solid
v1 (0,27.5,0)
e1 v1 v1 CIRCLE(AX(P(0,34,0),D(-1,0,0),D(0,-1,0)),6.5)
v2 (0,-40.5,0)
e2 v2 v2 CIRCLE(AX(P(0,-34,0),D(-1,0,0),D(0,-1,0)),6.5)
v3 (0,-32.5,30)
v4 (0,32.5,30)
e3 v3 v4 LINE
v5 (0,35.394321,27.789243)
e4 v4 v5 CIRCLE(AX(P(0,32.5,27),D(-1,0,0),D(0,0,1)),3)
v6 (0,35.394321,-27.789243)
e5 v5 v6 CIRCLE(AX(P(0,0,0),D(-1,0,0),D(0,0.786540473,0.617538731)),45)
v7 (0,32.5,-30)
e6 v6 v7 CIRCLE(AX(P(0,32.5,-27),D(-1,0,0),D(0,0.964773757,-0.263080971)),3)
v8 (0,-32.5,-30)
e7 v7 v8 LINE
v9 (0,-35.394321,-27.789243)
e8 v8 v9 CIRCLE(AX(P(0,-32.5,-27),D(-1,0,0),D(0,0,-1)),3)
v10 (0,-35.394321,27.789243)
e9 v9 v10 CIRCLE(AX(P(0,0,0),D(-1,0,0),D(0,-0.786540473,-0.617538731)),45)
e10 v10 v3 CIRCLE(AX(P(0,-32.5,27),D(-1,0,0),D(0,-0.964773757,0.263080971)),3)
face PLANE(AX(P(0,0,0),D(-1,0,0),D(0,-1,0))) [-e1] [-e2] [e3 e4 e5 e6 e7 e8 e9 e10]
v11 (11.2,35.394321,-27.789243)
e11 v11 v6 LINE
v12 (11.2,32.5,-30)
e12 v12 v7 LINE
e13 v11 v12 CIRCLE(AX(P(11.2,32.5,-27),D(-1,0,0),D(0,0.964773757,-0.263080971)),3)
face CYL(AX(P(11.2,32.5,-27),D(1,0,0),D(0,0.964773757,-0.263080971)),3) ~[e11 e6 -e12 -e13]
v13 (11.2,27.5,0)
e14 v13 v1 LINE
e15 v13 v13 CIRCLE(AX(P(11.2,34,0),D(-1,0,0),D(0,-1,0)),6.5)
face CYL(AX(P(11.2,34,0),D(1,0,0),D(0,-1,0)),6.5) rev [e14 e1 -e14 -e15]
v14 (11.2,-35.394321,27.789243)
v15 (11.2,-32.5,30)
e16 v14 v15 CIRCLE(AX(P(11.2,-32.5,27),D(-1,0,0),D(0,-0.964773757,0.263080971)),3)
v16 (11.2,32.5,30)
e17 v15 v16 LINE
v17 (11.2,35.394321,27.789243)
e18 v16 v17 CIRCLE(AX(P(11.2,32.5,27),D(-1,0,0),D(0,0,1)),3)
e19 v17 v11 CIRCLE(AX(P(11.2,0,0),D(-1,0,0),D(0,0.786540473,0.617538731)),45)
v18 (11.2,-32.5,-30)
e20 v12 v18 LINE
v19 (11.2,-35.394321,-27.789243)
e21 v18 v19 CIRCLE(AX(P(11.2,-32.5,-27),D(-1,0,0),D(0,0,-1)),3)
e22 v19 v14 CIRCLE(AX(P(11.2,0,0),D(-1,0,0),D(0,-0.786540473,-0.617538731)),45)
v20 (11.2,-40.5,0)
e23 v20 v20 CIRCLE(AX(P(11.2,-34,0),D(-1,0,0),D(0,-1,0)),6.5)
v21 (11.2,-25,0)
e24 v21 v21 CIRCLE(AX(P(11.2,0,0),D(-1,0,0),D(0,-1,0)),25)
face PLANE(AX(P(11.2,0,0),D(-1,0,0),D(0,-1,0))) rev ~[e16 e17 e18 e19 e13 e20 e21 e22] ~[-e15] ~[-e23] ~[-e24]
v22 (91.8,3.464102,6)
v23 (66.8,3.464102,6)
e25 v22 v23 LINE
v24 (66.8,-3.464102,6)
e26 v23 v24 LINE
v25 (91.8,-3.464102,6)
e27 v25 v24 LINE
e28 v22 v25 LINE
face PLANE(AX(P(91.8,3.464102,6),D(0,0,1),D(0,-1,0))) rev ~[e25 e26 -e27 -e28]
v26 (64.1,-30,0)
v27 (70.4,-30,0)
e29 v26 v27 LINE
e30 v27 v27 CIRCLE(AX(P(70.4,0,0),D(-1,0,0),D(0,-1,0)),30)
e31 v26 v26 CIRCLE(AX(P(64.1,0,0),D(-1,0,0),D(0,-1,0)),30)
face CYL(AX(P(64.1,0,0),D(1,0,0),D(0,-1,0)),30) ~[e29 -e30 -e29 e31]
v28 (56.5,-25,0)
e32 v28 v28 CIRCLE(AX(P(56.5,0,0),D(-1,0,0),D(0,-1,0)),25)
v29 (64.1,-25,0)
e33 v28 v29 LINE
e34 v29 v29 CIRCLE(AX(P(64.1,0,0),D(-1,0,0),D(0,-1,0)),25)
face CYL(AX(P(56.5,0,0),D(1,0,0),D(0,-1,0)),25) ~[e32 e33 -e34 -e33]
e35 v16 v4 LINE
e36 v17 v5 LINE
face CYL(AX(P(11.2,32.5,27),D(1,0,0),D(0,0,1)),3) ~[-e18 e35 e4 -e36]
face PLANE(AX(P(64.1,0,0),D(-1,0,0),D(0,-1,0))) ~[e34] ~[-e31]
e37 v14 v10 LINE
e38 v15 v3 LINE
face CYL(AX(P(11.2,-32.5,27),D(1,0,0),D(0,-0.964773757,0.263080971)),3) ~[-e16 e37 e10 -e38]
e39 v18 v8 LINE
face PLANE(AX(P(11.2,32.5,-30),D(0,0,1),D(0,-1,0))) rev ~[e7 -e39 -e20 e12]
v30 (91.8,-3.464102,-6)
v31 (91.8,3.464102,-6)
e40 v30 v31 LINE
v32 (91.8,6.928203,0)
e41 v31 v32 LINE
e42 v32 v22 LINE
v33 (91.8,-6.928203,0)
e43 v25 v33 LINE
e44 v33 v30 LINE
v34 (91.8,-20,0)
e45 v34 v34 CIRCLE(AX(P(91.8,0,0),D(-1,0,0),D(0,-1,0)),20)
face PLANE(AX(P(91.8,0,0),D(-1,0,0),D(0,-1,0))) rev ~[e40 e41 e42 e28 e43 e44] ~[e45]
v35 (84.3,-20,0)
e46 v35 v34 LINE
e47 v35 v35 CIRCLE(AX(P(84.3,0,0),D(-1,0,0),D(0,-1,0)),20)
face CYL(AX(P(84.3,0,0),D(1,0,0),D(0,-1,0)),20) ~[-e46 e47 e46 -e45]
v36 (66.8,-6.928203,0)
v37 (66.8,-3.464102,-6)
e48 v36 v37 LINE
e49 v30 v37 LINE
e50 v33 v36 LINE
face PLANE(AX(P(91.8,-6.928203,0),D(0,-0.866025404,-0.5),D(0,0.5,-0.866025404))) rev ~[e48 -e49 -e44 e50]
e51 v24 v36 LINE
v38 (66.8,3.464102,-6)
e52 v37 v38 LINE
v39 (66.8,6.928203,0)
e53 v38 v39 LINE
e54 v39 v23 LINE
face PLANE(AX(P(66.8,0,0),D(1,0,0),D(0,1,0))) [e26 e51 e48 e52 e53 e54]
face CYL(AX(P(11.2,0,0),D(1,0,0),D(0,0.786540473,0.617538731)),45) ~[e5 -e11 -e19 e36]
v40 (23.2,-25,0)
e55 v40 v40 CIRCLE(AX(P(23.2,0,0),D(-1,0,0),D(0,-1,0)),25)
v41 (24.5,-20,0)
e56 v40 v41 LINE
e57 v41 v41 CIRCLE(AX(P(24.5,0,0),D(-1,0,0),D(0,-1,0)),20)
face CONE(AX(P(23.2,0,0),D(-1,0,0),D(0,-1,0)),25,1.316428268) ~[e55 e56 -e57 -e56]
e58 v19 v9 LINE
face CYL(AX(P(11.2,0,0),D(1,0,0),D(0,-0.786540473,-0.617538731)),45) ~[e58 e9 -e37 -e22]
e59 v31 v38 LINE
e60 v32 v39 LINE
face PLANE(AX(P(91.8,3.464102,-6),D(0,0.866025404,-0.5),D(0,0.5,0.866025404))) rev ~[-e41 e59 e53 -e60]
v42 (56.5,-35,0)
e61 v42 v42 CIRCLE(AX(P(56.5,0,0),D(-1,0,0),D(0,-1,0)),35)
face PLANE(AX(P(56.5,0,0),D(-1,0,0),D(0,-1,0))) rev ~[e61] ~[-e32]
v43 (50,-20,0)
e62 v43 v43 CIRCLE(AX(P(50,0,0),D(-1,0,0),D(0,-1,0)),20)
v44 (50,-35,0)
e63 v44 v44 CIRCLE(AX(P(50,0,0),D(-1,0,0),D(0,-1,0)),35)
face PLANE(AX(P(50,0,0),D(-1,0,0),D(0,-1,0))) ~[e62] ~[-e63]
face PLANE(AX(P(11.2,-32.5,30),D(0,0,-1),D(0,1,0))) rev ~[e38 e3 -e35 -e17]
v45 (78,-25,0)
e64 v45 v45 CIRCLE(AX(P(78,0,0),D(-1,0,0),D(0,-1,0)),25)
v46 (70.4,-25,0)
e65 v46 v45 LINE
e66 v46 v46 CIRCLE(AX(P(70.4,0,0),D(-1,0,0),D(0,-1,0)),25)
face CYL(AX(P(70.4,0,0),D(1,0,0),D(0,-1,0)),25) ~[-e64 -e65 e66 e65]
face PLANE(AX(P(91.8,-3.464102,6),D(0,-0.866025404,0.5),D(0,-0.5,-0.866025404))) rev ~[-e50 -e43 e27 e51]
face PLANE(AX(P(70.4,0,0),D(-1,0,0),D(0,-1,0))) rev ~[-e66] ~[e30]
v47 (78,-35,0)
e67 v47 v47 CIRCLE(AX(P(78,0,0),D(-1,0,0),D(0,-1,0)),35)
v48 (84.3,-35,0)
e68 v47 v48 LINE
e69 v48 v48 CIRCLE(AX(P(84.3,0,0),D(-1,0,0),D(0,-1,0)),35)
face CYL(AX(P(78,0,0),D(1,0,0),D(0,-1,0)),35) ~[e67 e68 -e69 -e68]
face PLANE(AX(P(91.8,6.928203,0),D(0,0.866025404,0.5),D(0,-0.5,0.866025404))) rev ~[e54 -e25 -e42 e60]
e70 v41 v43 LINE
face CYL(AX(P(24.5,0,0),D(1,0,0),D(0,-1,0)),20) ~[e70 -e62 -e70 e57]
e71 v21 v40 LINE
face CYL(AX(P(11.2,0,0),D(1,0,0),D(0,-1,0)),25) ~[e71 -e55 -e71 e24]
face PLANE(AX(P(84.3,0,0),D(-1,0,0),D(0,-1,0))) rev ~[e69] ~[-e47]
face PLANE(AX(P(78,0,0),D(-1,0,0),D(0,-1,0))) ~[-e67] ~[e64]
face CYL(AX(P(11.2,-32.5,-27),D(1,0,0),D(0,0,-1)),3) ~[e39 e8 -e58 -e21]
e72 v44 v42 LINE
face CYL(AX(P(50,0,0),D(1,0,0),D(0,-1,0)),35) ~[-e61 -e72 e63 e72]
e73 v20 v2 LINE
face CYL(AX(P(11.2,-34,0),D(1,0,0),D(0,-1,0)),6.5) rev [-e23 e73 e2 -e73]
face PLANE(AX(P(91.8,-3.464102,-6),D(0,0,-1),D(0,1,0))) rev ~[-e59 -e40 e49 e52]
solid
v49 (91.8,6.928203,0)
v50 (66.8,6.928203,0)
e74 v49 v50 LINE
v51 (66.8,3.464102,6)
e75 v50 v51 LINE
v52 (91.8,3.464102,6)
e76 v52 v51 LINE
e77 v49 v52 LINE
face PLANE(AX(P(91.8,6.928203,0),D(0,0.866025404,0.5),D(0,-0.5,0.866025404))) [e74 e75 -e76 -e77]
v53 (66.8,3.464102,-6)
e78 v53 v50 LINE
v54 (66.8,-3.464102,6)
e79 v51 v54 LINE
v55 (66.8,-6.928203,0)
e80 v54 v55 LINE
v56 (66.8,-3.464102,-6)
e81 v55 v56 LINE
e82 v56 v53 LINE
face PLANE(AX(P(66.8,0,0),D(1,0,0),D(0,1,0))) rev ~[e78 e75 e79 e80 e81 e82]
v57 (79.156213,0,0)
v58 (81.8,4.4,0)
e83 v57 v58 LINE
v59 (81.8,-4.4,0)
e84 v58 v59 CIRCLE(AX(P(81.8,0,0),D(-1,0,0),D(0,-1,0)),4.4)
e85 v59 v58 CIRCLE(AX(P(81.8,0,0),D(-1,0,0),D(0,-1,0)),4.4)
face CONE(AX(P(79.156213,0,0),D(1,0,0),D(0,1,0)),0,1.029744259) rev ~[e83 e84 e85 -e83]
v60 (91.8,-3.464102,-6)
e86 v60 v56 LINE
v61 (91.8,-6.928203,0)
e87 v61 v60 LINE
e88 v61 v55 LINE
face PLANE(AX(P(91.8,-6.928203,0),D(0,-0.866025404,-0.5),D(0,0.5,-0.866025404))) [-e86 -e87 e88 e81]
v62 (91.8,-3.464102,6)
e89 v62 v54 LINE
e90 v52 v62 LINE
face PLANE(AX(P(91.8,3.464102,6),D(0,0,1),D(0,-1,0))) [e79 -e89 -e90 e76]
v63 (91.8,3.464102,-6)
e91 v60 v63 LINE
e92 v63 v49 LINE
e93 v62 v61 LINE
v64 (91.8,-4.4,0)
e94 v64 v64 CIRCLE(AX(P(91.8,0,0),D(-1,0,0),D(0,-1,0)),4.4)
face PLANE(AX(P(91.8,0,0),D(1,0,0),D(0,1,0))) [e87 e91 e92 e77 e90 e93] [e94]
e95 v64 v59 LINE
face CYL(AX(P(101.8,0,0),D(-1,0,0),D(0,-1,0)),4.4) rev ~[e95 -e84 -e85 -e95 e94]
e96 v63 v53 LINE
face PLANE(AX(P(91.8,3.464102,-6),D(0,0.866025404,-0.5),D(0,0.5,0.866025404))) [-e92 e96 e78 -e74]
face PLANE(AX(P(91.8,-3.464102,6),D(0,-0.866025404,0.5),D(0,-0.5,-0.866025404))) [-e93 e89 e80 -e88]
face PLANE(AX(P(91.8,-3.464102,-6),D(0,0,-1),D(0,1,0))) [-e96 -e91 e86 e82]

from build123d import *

# Parameters (mm, degrees)
F2_R     = 6.5
F2_R_2   = 25
F3_DEPTH = 11.2
F5_DEPTH = 25
F7_D     = 8.8
F7_DEPTH = 10
F7_TIP   = 2.6437867237


with BuildPart() as f1:
    # F0 (on Top) → F1 (revolve)
    with BuildSketch(Plane.XY):
        Polygon((11.2, 0), (11.2, -25), (23.2, -25), (24.5, -20), (50, -20), (50, -35), (56.5, -35), (56.5, -25), (64.1, -25), (64.1, -30), (70.4, -30), (70.4, -25), (78, -25), (78, -35), (84.3, -35), (84.3, -20), (91.8, -20), (91.8, 0), align=None)
    revolve(axis=Axis((46.0906531856, 0, 0), (-1, 0, 0)))

    # F2 (on face) → F3 (join)
    with BuildSketch(Plane(origin=(11.2, 0, 0), x_dir=(0, -1, 0), z_dir=(-1, 0, 0))):
        with BuildLine():
            Line((32.5, 30), (0, 30))
            Line((0, 30), (-32.5, 30))
            ThreePointArc((-32.5, 30), (-34.3210259826, 29.3840856467), (-35.3943212715, 27.7892429139))
            ThreePointArc((-35.3943212715, 27.7892429139), (-45, 0), (-35.3943212715, -27.7892429139))
            ThreePointArc((-35.3943212715, -27.7892429139), (-34.3210259826, -29.3840856467), (-32.5, -30))
            Line((-32.5, -30), (0, -30))
            Line((0, -30), (32.5, -30))
            ThreePointArc((32.5, -30), (34.3210259826, -29.3840856467), (35.3943212715, -27.7892429139))
            ThreePointArc((35.3943212715, -27.7892429139), (45, 0), (35.3943212715, 27.7892429139))
            ThreePointArc((35.3943212715, 27.7892429139), (34.3210259826, 29.3840856467), (32.5, 30))
        make_face()
        with Locations((-34, 0)):
            Circle(F2_R, mode=Mode.SUBTRACT)
        Circle(F2_R_2, mode=Mode.SUBTRACT)
        with Locations((34, 0)):
            Circle(F2_R, mode=Mode.SUBTRACT)
        Circle(F2_R_2)
    extrude(amount=F3_DEPTH)


with BuildPart() as f5:
    # F4 (on face) → F5 (new body)
    with BuildSketch(Plane.YZ.offset(91.8)):
        Polygon((-3.4641016151, -6), (3.4641016151, -6), (6.9282032303, 0), (3.4641016151, 6), (-3.4641016151, 6), (-6.9282032303, 0), align=None)
    extrude(amount=-F5_DEPTH)


with BuildPart() as f1_1:
    add(f1.part)

    # F6: cut F5
    add(f5.part, mode=Mode.SUBTRACT)


with BuildPart() as f5_1:
    add(f5.part)

    # F7
    with Locations(Plane.YZ.offset(91.8)):
        with Locations((0, 0)):
            Hole(F7_D / 2, depth=F7_DEPTH)
            with Locations((0, 0, -(F7_DEPTH + F7_TIP / 2))):  # 118° drill point
                Cone(0, F7_D / 2, F7_TIP, mode=Mode.SUBTRACT)


solid = Compound([f1_1.part, f5_1.part])
